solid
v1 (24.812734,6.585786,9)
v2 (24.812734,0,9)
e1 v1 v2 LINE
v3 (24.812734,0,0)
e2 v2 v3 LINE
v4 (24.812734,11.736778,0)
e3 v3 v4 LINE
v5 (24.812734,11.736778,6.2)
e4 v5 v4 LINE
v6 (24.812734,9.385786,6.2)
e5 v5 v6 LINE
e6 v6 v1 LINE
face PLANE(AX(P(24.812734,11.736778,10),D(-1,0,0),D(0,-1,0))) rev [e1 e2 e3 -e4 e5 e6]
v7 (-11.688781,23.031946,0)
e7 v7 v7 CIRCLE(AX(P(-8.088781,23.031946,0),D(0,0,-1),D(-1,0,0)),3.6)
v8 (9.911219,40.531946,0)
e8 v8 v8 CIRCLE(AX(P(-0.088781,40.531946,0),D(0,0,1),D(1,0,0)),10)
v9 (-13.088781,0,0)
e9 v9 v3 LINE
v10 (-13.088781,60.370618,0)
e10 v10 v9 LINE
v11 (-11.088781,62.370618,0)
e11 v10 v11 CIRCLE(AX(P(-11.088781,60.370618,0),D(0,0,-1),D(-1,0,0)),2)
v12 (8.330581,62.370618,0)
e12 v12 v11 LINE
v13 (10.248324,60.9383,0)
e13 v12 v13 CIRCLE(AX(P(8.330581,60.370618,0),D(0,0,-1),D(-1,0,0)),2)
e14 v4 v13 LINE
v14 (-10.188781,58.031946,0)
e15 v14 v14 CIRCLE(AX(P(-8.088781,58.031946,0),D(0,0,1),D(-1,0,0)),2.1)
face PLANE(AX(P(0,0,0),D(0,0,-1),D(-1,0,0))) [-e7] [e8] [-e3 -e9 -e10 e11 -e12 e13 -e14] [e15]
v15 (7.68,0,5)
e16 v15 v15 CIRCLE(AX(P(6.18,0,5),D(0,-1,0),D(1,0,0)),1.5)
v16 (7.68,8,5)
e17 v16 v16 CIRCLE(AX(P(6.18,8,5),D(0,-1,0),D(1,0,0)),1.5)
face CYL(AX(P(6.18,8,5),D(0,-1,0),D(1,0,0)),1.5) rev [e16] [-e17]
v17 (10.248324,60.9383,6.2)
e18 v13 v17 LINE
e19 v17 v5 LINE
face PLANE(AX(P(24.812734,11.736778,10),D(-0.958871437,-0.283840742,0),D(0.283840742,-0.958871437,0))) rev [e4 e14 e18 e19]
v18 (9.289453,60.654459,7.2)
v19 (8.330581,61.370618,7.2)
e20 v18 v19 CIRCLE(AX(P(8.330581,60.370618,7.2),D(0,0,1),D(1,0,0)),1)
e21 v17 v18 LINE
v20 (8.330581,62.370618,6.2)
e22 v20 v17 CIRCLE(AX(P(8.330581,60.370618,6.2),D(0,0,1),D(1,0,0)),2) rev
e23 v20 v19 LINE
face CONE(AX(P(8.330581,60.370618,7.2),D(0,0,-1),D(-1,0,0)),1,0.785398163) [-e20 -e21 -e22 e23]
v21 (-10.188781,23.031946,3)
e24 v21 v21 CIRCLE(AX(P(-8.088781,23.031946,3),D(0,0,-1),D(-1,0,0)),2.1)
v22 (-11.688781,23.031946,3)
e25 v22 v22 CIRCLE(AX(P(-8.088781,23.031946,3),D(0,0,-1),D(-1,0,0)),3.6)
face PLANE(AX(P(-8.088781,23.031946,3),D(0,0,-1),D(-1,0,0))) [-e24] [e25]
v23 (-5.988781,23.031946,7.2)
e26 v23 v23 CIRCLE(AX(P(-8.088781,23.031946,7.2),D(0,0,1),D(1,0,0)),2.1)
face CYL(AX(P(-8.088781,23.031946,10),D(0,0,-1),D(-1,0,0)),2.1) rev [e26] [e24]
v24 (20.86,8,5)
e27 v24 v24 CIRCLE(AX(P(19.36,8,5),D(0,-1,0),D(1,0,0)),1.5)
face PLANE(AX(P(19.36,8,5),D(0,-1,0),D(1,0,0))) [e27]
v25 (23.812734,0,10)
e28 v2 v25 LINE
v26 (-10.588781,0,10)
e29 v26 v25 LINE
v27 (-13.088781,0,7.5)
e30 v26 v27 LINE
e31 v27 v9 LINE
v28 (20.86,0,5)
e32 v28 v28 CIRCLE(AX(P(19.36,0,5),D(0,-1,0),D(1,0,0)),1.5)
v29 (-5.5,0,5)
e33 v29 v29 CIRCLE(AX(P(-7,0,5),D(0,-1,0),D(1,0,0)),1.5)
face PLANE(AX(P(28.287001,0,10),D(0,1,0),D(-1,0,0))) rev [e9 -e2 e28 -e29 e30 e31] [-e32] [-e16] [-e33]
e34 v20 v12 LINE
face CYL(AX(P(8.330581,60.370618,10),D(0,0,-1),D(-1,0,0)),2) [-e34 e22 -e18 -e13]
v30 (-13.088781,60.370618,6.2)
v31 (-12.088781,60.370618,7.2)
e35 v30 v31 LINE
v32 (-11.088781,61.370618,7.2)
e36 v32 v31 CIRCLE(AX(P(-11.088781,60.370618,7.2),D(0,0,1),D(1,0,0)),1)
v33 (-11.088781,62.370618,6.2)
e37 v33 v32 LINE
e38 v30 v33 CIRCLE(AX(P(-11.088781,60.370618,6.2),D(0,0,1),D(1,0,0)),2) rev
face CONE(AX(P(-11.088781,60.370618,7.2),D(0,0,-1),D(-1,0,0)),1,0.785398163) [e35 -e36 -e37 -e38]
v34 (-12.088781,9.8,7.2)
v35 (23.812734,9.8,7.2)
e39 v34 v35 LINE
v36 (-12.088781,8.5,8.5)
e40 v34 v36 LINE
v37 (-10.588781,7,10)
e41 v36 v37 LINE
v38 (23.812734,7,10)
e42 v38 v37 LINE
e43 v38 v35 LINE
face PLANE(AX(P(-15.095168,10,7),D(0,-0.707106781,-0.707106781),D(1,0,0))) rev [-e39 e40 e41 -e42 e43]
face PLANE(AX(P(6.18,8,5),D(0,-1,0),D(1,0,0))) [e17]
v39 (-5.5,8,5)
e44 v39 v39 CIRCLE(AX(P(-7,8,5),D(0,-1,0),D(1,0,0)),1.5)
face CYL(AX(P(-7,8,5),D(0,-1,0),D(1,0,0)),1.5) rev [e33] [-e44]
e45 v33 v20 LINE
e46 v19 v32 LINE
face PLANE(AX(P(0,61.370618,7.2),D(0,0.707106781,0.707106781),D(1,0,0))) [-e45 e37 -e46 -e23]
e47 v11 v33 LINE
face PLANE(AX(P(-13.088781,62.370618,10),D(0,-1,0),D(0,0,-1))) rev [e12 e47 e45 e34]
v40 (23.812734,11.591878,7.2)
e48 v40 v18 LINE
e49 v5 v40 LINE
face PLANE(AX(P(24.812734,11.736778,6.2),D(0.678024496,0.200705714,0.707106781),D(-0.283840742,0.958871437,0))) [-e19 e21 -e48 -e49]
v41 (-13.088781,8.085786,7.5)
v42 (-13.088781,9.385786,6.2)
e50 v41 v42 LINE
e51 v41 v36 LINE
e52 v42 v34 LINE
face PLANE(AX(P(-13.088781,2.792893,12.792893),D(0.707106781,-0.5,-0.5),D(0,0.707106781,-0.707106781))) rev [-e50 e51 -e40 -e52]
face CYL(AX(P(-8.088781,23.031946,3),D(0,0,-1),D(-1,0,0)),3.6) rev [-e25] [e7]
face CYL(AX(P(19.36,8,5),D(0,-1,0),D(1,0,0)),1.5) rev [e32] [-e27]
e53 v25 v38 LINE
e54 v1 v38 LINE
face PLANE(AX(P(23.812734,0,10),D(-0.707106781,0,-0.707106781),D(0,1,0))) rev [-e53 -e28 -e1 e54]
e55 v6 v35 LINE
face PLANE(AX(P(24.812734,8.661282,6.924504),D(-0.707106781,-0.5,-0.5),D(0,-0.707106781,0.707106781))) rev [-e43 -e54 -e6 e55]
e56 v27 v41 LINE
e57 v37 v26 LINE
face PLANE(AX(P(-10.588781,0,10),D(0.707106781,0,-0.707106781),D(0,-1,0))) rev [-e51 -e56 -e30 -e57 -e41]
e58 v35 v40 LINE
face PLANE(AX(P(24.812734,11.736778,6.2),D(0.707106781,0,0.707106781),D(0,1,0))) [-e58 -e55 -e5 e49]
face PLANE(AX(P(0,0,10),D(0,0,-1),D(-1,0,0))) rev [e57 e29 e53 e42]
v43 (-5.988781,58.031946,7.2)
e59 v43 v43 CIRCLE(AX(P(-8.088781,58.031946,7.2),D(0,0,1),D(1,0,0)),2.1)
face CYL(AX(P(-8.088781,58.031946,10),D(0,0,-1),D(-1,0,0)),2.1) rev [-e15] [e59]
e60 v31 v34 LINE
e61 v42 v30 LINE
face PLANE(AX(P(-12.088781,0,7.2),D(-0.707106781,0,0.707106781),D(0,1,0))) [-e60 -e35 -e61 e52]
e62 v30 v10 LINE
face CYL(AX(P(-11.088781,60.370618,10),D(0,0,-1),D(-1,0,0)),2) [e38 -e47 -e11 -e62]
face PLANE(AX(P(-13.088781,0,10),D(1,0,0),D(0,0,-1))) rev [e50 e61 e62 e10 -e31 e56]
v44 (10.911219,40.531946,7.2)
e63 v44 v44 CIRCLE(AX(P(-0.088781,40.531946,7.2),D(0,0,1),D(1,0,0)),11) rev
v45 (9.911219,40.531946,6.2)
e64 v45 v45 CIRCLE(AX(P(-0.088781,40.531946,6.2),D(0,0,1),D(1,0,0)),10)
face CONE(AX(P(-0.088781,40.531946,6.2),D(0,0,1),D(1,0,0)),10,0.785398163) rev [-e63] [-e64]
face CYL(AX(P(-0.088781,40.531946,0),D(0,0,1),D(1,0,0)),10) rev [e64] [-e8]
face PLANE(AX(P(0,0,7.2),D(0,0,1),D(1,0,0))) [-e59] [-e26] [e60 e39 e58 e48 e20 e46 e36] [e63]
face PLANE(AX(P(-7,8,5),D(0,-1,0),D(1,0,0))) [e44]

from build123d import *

# Parameters (mm, degrees)
SKIZZE1_R                            = 2.1
AUFSATZ_LINEAR_AUSTRAGEN1_DEPTH      = 10
SKIZZE2_R                            = 1.5
SCHNITT_LINEAR_AUSTRAGEN1_DEPTH      = 8
SCHNITT_LINEAR_AUSTRAGEN3_DEPTH      = 2.8
SCHNITT_LINEAR_AUSTRAGEN5_DEPTH      = 69.862823313
SCHNITT_LINEAR_AUSTRAGEN5_DEPTH_BACK = 69.862823313
SKIZZE7_R                            = 10
FASE1_SIZE                           = 3
SCHNITT_LINEAR_AUSTRAGEN4_DEPTH      = 10
VERRUNDUNG1_R                        = 2
FASE2_SIZE                           = 1
FASE3_SIZE                           = 2.5
SKIZZE8_R                            = 3.6
SCHNITT_LINEAR_AUSTRAGEN6_DEPTH      = 3


with BuildPart() as part:
    # Skizze1 → Aufsatz-Linear austragen1 (new body)
    with BuildSketch(Plane.XY):
        Polygon((28.287001282, 57.370618027), (28.287001282, 0), (-13.088781156, 0), (-13.088781156, 27.348243657), (-13.088781156, 53.715647777), (-13.088781156, 57.370618027), (-13.088781156, 62.370618027), (28.287001282, 62.370618027), align=None)
        with Locations((-8.088781156, 23.031945717)):
            Circle(SKIZZE1_R, mode=Mode.SUBTRACT)
        with Locations(Location((-8.088781156, 58.031945717, 0), (0, 0, 180))):
            Circle(SKIZZE1_R, mode=Mode.SUBTRACT)
    extrude(amount=AUFSATZ_LINEAR_AUSTRAGEN1_DEPTH)

    # Skizze2 → Schnitt-Linear austragen1 (cut)
    with BuildSketch(Plane.XZ):
        with Locations((-7, 5)):
            Circle(SKIZZE2_R)
        with Locations((6.18, 5)):
            Circle(SKIZZE2_R)
        with Locations((19.36, 5)):
            Circle(SKIZZE2_R)
    extrude(amount=-SCHNITT_LINEAR_AUSTRAGEN1_DEPTH, mode=Mode.SUBTRACT)

    # Skizze4 → Schnitt-Linear austragen3 (cut)
    with BuildSketch(Plane.XY.offset(10)):
        Polygon((-15.095168359, 10), (28.287001282, 10), (36.093332102, 46.989971623), (30.429094825, 65.957451721), (-16.081030445, 65.957451721), (-16.081030445, 27.753515123), align=None)
    extrude(amount=-SCHNITT_LINEAR_AUSTRAGEN3_DEPTH, mode=Mode.SUBTRACT)

    # Skizze7 → Schnitt-Linear austragen5 (cut, two sides: drawn at the far end of the back side and taken through both)
    with BuildSketch(Plane.XY.offset(7.2).offset(-SCHNITT_LINEAR_AUSTRAGEN5_DEPTH_BACK)):
        with Locations((-0.088781156, 40.531945717)):
            Circle(SKIZZE7_R)
    extrude(amount=SCHNITT_LINEAR_AUSTRAGEN5_DEPTH + SCHNITT_LINEAR_AUSTRAGEN5_DEPTH_BACK, mode=Mode.SUBTRACT)

    # Fase1
    # the kernel refuses this chamfer: 3 mm, written as the material it takes off along each edge
    with BuildSketch(Plane(origin=(-20.80383012, 10, 10), x_dir=(0, -0.9996219169112969, 0.027495876610586202), z_dir=(1, 0, 0))) as fase1_piece_1_section:
        Polygon((FASE1_SIZE * 0.999621916911, FASE1_SIZE * 0.0274958766106), (-FASE1_SIZE * 0.0274958766106, FASE1_SIZE * 0.999621916911), (0, 0), align=None)
    fase1_piece_1 = extrude(amount=56.805880365, mode=Mode.PRIVATE)
    fase1_piece_1 = split(fase1_piece_1, bisect_by=Plane(origin=(7.599110063, 8.999392985, 7.2), z_dir=(0, 0, 1)), keep=Keep.TOP, mode=Mode.PRIVATE)
    add(fase1_piece_1, mode=Mode.SUBTRACT)

    # Skizze5 → Schnitt-Linear austragen4 (cut)
    with BuildSketch(Plane(origin=(0, 0, 0), x_dir=(-1, 0, 0), z_dir=(0, 0, -1))):
        Polygon((-24.81273389, 11.736777957), (-9.824335871, 62.370618027), (-28.287001282, 62.370618027), (-28.287001282, 0), (-24.81273389, 0), align=None)
    extrude(amount=-SCHNITT_LINEAR_AUSTRAGEN4_DEPTH, mode=Mode.SUBTRACT)

    # Verrundung1
    verrundung1_edges = [part.edges().sort_by_distance(p)[0] for p in [
        (9.824335871, 62.370618027, 3.6),
        (-13.088781156, 62.370618027, 3.6),
    ]]
    fillet(verrundung1_edges, radius=VERRUNDUNG1_R)

    # Fase2
    fase2_edges = [part.edges().sort_by_distance(p)[0] for p in [
        (24.81273389, 10.768388979, 7.2),
        (24.81273389, 3.5, 10),
        (-13.088781156, 35.085309014, 7.2),
        (-1.379099888, 62.370618027, 7.2),
        (17.530529072, 36.337538735, 7.2),
        (9.527376482, 61.973016693, 7.2),
        (-12.502994718, 61.78483159, 7.2),
        (-10.088781156, 40.531945717, 7.2),
        (-13.088781156, 8.4, 8.6),
        (24.81273389, 8.4, 8.6),
    ]]
    chamfer(fase2_edges, length=FASE2_SIZE)

    # Fase3
    fase3_edges = [part.edges().sort_by_distance(p)[0] for p in [
        (-13.088781156, 2.792893219, 10),
    ]]
    chamfer(fase3_edges, length=FASE3_SIZE)

    # Skizze8 → Schnitt-Linear austragen6 (cut)
    with BuildSketch(Plane(origin=(0, 0, 0), x_dir=(-1, 0, 0), z_dir=(0, 0, -1))):
        with Locations((8.088781156, 23.031945717)):
            Circle(SKIZZE8_R)
    extrude(amount=-SCHNITT_LINEAR_AUSTRAGEN6_DEPTH, mode=Mode.SUBTRACT)


solid = part.part
